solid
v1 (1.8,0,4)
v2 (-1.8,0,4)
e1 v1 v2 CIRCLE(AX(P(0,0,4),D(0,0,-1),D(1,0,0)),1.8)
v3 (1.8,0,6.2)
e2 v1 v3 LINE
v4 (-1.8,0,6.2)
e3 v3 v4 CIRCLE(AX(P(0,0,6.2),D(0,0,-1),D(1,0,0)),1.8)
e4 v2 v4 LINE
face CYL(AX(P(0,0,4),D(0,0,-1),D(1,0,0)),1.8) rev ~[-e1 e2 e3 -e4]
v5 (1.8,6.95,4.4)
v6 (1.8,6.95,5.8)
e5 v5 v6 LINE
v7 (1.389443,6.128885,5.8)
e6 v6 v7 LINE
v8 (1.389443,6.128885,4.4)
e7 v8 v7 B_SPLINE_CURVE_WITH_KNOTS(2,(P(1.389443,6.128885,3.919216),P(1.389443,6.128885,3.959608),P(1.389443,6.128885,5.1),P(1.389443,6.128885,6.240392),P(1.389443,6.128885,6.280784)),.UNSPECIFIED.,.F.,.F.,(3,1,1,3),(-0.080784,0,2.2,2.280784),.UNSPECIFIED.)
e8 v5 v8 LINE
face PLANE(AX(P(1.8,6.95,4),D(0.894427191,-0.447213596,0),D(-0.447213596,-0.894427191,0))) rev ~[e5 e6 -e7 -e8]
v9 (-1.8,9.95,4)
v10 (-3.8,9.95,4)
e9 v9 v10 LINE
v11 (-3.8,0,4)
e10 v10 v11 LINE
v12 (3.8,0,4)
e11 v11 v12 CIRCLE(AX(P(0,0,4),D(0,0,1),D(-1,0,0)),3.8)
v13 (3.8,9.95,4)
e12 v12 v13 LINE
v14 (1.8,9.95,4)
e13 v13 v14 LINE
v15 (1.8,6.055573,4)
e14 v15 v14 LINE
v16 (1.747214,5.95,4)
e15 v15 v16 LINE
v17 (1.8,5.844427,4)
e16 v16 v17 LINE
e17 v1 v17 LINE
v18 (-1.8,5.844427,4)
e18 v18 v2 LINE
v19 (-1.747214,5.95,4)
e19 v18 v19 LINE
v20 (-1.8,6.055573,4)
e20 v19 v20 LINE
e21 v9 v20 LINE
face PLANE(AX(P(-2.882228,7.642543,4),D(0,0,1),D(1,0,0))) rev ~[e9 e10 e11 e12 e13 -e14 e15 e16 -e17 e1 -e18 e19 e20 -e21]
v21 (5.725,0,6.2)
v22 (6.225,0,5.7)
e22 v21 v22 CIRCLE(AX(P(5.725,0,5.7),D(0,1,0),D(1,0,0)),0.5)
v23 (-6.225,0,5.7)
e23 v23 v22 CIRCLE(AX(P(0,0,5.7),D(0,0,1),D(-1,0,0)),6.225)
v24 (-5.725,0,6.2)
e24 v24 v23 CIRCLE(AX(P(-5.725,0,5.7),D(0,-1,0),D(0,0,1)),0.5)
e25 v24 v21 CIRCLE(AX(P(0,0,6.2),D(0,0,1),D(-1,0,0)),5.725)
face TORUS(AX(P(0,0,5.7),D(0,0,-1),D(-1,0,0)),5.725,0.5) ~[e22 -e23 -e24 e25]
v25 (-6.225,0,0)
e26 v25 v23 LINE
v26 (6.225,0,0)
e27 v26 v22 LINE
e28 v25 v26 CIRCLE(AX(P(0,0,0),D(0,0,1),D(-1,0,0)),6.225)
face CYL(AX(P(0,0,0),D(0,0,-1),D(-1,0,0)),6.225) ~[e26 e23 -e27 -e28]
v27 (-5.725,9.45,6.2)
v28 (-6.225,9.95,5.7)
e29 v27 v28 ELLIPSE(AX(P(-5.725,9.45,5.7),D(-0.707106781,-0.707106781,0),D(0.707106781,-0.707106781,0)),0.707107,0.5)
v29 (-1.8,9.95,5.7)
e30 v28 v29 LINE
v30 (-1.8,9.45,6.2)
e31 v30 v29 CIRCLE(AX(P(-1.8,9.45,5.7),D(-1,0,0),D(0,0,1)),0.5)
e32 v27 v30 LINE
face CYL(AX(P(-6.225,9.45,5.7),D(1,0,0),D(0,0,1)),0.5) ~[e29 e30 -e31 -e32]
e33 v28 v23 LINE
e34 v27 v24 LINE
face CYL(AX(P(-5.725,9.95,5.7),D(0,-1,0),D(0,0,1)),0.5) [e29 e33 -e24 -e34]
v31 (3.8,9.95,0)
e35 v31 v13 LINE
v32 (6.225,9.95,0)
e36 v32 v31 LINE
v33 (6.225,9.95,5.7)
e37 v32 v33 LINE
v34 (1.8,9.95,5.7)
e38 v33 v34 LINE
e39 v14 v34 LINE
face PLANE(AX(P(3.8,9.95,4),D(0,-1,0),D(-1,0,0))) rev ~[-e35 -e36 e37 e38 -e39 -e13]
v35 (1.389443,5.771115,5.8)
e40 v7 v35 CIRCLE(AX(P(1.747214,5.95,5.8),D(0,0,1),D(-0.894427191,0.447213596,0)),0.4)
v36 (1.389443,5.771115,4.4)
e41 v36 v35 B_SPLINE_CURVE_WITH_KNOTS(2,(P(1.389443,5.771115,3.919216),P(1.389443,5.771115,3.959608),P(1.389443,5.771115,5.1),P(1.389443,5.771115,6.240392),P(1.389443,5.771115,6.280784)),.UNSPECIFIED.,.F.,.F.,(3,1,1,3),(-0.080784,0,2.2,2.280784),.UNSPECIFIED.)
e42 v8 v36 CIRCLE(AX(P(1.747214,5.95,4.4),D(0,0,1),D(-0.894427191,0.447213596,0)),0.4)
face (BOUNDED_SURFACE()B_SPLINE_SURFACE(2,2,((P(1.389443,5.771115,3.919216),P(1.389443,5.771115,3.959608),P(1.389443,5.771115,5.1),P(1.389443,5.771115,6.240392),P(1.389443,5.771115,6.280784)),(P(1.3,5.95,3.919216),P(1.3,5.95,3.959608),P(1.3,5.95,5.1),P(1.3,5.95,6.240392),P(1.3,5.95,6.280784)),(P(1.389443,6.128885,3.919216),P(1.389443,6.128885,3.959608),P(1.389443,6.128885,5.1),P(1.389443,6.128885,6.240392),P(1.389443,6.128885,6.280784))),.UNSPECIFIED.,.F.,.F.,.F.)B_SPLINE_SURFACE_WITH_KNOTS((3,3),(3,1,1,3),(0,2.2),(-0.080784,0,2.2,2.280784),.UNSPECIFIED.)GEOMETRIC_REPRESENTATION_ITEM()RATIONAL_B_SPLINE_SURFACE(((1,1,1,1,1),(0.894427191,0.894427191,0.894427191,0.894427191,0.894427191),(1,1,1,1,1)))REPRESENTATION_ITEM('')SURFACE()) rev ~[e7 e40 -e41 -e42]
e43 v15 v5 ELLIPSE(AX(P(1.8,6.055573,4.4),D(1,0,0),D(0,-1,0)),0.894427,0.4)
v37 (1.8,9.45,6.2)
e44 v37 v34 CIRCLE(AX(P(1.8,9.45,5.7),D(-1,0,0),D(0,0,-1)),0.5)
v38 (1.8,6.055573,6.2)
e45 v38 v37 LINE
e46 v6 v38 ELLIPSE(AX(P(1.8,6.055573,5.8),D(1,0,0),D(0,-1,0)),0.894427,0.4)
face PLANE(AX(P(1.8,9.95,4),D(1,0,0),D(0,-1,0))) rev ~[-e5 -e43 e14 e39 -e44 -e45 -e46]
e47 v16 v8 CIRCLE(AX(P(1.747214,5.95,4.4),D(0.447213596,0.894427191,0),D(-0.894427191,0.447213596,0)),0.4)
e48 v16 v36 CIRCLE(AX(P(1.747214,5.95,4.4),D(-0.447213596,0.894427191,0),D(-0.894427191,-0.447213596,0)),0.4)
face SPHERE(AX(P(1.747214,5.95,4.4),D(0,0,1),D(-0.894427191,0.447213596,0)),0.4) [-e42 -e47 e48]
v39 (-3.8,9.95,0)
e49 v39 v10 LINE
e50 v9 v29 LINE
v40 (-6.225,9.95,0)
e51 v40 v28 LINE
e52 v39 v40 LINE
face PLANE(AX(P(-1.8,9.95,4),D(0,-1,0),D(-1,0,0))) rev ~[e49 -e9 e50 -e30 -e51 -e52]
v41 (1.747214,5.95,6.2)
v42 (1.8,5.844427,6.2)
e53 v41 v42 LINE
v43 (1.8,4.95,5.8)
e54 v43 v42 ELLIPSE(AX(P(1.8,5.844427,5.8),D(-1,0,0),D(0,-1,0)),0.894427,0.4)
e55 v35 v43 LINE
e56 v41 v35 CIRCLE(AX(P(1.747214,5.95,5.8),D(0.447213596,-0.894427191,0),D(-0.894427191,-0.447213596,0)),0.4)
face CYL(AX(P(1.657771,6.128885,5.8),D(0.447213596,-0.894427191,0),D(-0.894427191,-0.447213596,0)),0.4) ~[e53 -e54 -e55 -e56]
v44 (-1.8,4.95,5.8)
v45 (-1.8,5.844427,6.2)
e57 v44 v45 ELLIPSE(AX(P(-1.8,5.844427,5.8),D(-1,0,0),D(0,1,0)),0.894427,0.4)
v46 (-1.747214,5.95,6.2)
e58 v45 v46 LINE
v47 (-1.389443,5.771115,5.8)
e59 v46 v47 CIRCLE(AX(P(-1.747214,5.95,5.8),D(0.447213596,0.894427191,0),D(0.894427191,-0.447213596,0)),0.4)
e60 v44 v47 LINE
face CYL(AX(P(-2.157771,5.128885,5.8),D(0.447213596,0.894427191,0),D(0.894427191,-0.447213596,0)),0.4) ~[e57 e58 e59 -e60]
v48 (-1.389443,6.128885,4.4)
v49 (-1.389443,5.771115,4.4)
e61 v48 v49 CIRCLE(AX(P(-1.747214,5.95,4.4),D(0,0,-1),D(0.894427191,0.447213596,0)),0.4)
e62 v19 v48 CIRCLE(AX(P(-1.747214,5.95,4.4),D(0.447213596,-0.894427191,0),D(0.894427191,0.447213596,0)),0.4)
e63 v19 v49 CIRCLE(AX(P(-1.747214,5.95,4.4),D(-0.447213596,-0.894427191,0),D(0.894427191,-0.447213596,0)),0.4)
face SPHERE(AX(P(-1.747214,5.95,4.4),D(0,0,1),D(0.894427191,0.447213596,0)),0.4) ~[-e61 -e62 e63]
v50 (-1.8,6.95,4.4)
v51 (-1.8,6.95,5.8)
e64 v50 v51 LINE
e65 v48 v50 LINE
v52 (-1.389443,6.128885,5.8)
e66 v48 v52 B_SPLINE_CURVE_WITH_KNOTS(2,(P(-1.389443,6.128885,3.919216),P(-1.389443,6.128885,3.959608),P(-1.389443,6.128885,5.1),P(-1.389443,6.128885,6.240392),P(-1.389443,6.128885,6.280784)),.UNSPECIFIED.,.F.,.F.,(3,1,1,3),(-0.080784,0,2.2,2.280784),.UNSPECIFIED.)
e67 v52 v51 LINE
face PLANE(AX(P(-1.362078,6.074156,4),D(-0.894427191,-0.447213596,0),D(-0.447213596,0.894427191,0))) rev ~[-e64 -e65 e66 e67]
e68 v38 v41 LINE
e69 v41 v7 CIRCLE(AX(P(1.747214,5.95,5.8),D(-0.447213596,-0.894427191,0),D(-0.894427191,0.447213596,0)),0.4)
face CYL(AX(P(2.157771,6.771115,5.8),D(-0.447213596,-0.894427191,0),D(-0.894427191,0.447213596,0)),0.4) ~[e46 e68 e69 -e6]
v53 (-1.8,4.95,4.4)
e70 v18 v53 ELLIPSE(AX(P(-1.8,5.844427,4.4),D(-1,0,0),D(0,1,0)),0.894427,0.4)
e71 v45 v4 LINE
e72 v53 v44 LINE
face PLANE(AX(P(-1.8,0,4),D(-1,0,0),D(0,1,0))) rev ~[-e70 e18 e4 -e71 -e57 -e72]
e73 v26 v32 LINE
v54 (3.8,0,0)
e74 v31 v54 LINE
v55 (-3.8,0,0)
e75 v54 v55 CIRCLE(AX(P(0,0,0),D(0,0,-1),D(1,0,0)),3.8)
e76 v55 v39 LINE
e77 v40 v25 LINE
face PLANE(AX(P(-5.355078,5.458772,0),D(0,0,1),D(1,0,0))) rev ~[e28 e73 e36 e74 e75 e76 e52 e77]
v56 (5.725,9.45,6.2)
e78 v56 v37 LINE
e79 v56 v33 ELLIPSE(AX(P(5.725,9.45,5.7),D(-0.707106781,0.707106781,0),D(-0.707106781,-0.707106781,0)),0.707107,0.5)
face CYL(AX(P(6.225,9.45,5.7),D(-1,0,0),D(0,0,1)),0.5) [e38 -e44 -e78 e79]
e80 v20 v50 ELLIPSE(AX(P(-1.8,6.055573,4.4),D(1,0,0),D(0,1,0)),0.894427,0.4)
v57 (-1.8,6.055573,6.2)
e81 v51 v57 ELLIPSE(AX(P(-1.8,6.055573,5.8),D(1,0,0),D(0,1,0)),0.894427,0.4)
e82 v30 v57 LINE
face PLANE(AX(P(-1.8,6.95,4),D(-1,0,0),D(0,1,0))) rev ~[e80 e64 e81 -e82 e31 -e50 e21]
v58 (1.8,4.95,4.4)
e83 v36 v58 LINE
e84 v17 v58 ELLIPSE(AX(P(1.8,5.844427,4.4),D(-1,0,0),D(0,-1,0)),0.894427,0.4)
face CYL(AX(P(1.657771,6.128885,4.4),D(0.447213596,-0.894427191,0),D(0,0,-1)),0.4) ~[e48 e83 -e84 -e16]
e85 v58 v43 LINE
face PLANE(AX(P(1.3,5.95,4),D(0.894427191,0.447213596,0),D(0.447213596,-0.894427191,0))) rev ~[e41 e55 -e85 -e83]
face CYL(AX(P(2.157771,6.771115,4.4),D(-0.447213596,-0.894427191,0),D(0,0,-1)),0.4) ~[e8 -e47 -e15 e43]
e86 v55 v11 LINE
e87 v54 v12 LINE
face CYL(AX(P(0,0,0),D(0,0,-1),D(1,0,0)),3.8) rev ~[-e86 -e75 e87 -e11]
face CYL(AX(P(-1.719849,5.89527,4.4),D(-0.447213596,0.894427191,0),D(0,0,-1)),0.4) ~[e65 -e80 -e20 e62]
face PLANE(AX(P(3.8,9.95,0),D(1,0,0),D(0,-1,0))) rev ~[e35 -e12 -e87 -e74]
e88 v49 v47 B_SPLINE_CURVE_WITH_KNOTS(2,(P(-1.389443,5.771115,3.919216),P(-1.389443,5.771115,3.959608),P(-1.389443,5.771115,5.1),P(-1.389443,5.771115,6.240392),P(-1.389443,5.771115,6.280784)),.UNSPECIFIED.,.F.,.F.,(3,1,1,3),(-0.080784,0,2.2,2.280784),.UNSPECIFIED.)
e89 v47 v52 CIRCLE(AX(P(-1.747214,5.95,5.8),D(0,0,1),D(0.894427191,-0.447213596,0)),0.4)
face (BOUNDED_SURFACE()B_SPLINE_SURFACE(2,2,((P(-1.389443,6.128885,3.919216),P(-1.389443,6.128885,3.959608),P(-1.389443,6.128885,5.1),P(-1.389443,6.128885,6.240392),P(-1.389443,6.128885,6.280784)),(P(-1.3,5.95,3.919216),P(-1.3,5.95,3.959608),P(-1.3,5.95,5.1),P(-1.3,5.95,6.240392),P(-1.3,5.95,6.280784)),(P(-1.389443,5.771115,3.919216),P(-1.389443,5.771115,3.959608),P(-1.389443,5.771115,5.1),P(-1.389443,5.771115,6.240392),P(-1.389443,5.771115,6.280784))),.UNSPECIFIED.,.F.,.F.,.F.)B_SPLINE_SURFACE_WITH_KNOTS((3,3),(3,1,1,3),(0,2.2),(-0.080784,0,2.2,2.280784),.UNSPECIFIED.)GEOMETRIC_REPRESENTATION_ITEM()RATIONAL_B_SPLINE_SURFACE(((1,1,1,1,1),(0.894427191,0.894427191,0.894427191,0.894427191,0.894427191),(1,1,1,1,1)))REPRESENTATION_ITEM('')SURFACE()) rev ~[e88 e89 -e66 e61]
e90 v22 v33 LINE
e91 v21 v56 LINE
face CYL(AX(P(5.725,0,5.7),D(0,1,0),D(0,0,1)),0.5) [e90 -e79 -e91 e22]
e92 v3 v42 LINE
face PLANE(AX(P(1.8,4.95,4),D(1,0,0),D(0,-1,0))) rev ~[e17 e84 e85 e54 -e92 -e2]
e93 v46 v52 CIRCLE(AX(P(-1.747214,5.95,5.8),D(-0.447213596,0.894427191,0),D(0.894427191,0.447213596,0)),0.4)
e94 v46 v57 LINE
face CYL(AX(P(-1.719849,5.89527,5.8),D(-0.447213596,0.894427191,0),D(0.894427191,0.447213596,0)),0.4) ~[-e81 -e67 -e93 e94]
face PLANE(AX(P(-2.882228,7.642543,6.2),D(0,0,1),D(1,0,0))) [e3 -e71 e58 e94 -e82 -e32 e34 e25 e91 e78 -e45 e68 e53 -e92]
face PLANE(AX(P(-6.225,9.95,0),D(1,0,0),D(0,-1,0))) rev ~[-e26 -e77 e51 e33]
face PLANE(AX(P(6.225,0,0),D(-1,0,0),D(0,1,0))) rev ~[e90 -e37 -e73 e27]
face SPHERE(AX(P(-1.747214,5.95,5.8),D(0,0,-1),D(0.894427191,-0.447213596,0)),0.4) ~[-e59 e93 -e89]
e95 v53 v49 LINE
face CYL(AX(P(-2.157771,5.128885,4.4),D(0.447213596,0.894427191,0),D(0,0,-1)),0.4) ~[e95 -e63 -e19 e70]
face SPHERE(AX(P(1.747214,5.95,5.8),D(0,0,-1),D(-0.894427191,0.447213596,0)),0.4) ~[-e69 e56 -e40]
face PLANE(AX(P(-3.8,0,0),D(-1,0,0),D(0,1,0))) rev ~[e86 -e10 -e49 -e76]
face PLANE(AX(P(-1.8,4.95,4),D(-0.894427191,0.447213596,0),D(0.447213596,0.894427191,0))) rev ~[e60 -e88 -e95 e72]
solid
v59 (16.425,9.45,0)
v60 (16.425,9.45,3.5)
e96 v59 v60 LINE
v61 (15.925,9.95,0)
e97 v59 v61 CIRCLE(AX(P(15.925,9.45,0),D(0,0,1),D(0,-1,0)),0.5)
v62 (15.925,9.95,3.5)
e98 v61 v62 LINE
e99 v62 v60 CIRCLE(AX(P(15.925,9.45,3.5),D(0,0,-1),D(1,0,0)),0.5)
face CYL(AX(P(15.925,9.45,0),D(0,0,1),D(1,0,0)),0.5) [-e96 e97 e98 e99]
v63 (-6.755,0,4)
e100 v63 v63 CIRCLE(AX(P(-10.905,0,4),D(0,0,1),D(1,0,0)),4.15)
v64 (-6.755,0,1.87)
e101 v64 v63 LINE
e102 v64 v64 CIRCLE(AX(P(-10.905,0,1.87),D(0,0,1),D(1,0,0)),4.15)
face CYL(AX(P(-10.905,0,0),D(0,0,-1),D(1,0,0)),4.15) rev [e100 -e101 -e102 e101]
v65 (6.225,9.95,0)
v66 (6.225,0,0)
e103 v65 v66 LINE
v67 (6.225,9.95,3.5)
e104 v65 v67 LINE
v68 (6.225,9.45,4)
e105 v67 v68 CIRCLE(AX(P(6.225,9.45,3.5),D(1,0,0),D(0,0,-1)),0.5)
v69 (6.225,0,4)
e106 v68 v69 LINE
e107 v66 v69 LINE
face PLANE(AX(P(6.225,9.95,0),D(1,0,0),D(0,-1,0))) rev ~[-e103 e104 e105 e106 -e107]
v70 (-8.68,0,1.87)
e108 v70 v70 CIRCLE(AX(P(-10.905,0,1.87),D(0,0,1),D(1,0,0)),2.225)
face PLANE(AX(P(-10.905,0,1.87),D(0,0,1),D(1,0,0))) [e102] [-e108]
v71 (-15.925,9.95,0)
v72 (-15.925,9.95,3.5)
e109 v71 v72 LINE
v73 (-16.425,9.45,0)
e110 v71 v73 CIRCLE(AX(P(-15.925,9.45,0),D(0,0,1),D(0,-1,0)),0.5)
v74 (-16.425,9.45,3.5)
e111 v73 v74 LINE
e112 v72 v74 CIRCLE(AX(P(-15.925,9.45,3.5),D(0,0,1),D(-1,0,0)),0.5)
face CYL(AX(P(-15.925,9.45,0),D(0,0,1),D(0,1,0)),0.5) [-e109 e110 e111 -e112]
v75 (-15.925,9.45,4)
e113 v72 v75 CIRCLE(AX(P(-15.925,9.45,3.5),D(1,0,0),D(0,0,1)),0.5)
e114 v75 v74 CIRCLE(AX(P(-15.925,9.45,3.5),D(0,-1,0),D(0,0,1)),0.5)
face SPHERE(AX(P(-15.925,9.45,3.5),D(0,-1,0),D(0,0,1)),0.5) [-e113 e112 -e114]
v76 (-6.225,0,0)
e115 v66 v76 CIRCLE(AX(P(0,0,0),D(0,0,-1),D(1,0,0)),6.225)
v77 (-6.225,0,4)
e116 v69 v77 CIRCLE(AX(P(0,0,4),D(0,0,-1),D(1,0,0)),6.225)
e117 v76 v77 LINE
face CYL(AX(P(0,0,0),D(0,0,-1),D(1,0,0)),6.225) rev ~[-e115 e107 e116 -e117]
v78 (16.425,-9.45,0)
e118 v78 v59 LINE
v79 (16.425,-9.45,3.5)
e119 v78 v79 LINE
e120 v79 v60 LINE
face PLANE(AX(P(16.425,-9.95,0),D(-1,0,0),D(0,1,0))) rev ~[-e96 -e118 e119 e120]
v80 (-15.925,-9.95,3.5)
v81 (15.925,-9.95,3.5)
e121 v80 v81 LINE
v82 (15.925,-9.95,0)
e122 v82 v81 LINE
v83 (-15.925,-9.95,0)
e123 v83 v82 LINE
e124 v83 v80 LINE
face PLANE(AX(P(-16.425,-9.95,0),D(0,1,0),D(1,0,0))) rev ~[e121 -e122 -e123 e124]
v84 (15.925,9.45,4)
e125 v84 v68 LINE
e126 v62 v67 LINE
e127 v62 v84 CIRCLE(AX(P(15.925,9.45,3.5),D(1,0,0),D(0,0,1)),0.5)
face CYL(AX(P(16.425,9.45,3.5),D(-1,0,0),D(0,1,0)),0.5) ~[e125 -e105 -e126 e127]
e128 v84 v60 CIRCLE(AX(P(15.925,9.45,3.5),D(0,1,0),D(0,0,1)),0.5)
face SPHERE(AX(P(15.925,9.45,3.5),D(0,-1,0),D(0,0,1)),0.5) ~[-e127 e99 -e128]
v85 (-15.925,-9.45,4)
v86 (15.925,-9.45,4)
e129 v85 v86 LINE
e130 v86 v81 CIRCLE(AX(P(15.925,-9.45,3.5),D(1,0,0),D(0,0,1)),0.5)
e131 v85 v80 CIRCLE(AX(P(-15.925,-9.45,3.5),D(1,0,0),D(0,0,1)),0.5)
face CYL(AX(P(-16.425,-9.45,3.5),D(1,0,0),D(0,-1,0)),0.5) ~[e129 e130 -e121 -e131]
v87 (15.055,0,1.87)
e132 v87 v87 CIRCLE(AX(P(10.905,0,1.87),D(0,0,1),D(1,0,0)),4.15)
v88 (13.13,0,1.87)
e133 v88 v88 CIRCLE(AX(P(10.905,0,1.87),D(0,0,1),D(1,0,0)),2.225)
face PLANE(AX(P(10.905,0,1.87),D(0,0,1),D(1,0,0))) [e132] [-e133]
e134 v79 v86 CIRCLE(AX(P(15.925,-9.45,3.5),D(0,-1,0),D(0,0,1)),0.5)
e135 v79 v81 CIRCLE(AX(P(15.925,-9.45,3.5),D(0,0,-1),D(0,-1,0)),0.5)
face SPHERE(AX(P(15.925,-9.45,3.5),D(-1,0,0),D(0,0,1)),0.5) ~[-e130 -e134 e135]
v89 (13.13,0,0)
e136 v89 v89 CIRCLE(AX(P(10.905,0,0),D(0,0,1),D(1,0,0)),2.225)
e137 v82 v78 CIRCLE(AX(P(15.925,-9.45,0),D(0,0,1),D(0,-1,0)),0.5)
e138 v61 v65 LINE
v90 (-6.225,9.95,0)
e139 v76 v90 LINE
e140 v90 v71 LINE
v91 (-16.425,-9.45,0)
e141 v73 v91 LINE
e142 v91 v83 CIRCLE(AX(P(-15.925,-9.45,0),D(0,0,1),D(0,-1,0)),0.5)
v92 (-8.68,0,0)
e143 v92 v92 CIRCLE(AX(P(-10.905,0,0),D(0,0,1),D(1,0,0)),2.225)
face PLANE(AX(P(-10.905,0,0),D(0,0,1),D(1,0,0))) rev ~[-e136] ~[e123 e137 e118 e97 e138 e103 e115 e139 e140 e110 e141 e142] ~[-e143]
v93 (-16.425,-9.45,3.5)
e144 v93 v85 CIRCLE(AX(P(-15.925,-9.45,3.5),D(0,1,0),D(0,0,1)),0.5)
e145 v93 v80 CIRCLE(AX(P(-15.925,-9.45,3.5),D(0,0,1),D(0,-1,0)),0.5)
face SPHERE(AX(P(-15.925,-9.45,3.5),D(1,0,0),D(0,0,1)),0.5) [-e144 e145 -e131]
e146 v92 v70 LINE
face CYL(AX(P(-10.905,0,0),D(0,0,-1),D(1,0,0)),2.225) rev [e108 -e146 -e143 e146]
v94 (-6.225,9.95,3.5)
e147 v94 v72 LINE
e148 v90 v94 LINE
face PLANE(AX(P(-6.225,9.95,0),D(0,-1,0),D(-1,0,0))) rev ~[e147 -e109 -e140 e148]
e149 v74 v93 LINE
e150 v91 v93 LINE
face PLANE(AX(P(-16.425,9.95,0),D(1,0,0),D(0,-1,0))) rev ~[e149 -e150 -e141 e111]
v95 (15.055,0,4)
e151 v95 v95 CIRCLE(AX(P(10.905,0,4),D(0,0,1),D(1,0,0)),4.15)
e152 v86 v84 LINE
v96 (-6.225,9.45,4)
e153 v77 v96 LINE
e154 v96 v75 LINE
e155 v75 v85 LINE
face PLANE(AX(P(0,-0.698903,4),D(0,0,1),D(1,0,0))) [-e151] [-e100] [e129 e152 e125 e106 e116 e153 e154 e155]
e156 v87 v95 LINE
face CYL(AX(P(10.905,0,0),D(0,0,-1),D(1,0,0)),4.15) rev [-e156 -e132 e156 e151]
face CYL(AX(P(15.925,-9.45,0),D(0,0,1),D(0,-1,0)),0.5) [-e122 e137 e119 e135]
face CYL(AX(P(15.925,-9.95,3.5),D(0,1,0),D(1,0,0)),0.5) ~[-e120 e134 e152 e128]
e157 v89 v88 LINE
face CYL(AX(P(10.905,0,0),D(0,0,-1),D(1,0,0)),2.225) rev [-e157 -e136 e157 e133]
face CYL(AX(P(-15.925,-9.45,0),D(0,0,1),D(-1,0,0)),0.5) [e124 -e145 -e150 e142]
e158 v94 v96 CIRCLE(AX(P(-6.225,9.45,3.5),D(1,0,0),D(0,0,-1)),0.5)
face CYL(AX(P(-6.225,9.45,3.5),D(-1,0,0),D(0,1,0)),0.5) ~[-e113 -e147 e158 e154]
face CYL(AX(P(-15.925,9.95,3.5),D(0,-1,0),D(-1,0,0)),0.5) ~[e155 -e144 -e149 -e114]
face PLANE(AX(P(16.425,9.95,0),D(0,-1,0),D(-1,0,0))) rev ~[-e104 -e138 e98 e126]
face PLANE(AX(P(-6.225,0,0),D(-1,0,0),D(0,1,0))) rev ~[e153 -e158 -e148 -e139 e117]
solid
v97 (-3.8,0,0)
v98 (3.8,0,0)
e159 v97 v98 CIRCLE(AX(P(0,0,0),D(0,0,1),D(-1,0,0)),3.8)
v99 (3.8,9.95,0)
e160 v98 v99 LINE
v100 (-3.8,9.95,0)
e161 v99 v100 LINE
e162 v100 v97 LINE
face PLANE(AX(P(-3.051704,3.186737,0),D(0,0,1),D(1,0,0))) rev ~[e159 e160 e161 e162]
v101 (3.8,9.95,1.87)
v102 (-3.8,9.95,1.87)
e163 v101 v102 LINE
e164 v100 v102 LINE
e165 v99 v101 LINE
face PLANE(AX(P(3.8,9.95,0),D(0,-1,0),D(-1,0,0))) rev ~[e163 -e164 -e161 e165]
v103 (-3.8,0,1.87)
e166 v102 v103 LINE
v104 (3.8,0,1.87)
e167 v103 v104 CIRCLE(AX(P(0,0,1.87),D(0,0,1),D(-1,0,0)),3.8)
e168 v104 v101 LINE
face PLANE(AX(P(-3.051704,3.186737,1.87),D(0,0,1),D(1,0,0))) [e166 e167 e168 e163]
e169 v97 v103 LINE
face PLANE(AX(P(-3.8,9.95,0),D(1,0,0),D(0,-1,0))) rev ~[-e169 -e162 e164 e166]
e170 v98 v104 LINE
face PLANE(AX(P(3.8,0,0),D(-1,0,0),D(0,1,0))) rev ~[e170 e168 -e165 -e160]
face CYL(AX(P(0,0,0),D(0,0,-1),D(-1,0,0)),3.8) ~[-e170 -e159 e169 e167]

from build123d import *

# Parameters (mm, degrees)
F0_R     = 4.15
F1_DEPTH = 4
F0_R_2   = 2.225
F2_DEPTH = 1.87
F3_DEPTH = 6.2
F4_START = 4
F4_DEPTH = 2.2
F5_R     = 0.4
F6_R     = 0.5
F6_2_R   = 0.5


with BuildPart() as f1:
    # F0 (on Top) → F1 (new body)
    with BuildSketch(Plane.XY):
        with BuildLine():
            Line((-6.225, 9.95), (-16.425, 9.95))
            Line((-16.425, 9.95), (-16.425, -9.95))
            Line((-16.425, -9.95), (16.425, -9.95))
            Line((16.425, -9.95), (16.425, 9.95))
            Line((16.425, 9.95), (6.225, 9.95))
            Line((6.225, 9.95), (6.225, 0))
            ThreePointArc((6.225, 0), (0, -6.225), (-6.225, 0))
            Line((-6.225, 0), (-6.225, 9.95))
        make_face()
        with Locations((-10.905, 0)):
            Circle(F0_R, mode=Mode.SUBTRACT)
        with Locations((10.905, 0)):
            Circle(F0_R, mode=Mode.SUBTRACT)
    extrude(amount=F1_DEPTH)

    # F0 (on Top) → F2 (join)
    with BuildSketch(Plane.XY):
        with Locations((-10.905, 0)):
            Circle(F0_R)
        with Locations((-10.905, 0)):
            Circle(F0_R_2, mode=Mode.SUBTRACT)
        with Locations((10.905, 0)):
            Circle(F0_R)
        with Locations((10.905, 0)):
            Circle(F0_R_2, mode=Mode.SUBTRACT)
    extrude(amount=F2_DEPTH)

    # F6
    f6_edges = [f1.edges().sort_by_distance(p)[0] for p in [
        (0, -9.95, 4),
        (16.425, 0, 4),
        (-16.425, 0, 4),
        (-11.325, 9.95, 4),
        (11.325, 9.95, 4),
        (16.425, -9.95, 2),
        (-16.425, -9.95, 2),
        (16.425, 9.95, 2),
        (-16.425, 9.95, 2),
    ]]
    fillet(f6_edges, radius=F6_R)


with BuildPart() as f2:
    # F0 (on Top) → F2, piece 2 (new body)
    with BuildSketch(Plane.XY):
        with BuildLine():
            ThreePointArc((-1.8, 5.9590792074), (-2.8468319847, 5.5358985405), (-3.8, 4.9305805946))
            Line((-3.8, 4.9305805946), (-3.8, 0))
            ThreePointArc((-3.8, 0), (-3.2619012861, 1.949358869), (-1.8, 3.3466401061))
            Line((-1.8, 3.3466401061), (-1.8, 4.95))
            Line((-1.8, 4.95), (-1.8, 5.9590792074))
        make_face()
        with BuildLine():
            ThreePointArc((1.8, 3.3466401061), (0, 3.8), (-1.8, 3.3466401061))
            Line((-1.8, 3.3466401061), (-1.8, 0))
            ThreePointArc((-1.8, 0), (0, 1.8), (1.8, 0))
            Line((1.8, 0), (1.8, 3.3466401061))
        make_face()
        with BuildLine():
            ThreePointArc((-1.8, 3.3466401061), (-3.2619012861, 1.949358869), (-3.8, 0))
            ThreePointArc((-3.8, 0), (0, -3.8), (3.8, 0))
            ThreePointArc((3.8, 0), (3.2619012861, 1.949358869), (1.8, 3.3466401061))
            Line((1.8, 3.3466401061), (1.8, 0))
            ThreePointArc((1.8, 0), (0, -1.8), (-1.8, 0))
            Line((-1.8, 0), (-1.8, 3.3466401061))
        make_face()
        with BuildLine():
            ThreePointArc((1.8, 0), (0, 1.8), (-1.8, 0))
            ThreePointArc((-1.8, 0), (0, -1.8), (1.8, 0))
        make_face()
        with BuildLine():
            ThreePointArc((1.3620779041, 6.0741558083), (0, 6.225), (-1.3620779041, 6.0741558083))
            Line((-1.3620779041, 6.0741558083), (-1.3, 5.95))
            Line((-1.3, 5.95), (-1.8, 4.95))
            Line((-1.8, 4.95), (-1.8, 3.3466401061))
            ThreePointArc((-1.8, 3.3466401061), (0, 3.8), (1.8, 3.3466401061))
            Line((1.8, 3.3466401061), (1.8, 4.95))
            Line((1.8, 4.95), (1.3, 5.95))
            Line((1.3, 5.95), (1.3620779041, 6.0741558083))
        make_face()
        with BuildLine():
            Line((1.8, 9.95), (-1.8, 9.95))
            Line((-1.8, 9.95), (-1.8, 6.95))
            Line((-1.8, 6.95), (-1.3620779041, 6.0741558083))
            ThreePointArc((-1.3620779041, 6.0741558083), (0, 6.225), (1.3620779041, 6.0741558083))
            Line((1.3620779041, 6.0741558083), (1.8, 6.95))
            Line((1.8, 6.95), (1.8, 9.95))
        make_face()
        with BuildLine():
            Line((-1.8, 9.95), (-3.8, 9.95))
            Line((-3.8, 9.95), (-3.8, 4.9305805946))
            ThreePointArc((-3.8, 4.9305805946), (-2.8468319847, 5.5358985405), (-1.8, 5.9590792074))
            Line((-1.8, 5.9590792074), (-1.8, 6.95))
            Line((-1.8, 6.95), (-1.8, 9.95))
        make_face()
        with BuildLine():
            Line((3.8, 9.95), (1.8, 9.95))
            Line((1.8, 9.95), (1.8, 6.95))
            Line((1.8, 6.95), (1.8, 5.9590792074))
            ThreePointArc((1.8, 5.9590792074), (2.8468319847, 5.5358985405), (3.8, 4.9305805946))
            Line((3.8, 4.9305805946), (3.8, 9.95))
        make_face()
        with BuildLine():
            Line((3.8, 0), (3.8, 4.9305805946))
            ThreePointArc((3.8, 4.9305805946), (2.8468319847, 5.5358985405), (1.8, 5.9590792074))
            Line((1.8, 5.9590792074), (1.8, 4.95))
            Line((1.8, 4.95), (1.8, 3.3466401061))
            ThreePointArc((1.8, 3.3466401061), (3.2619012861, 1.949358869), (3.8, 0))
        make_face()
        with BuildLine():
            Line((1.8, 4.95), (1.8, 5.9590792074))
            ThreePointArc((1.8, 5.9590792074), (1.5820855931, 6.020600483), (1.3620779041, 6.0741558083))
            Line((1.3620779041, 6.0741558083), (1.3, 5.95))
            Line((1.3, 5.95), (1.8, 4.95))
        make_face()
        with BuildLine():
            Line((1.8, 5.9590792074), (1.8, 6.95))
            Line((1.8, 6.95), (1.3620779041, 6.0741558083))
            ThreePointArc((1.3620779041, 6.0741558083), (1.5820855931, 6.020600483), (1.8, 5.9590792074))
        make_face()
        with BuildLine():
            Line((-1.3620779041, 6.0741558083), (-1.8, 6.95))
            Line((-1.8, 6.95), (-1.8, 5.9590792074))
            ThreePointArc((-1.8, 5.9590792074), (-1.5820855931, 6.020600483), (-1.3620779041, 6.0741558083))
        make_face()
        with BuildLine():
            ThreePointArc((-1.3620779041, 6.0741558083), (-1.5820855931, 6.020600483), (-1.8, 5.9590792074))
            Line((-1.8, 5.9590792074), (-1.8, 4.95))
            Line((-1.8, 4.95), (-1.3, 5.95))
            Line((-1.3, 5.95), (-1.3620779041, 6.0741558083))
        make_face()
    extrude(amount=F2_DEPTH)


with BuildPart() as f3:
    # F0 (on Top) → F3 (new body)
    with BuildSketch(Plane.XY):
        with BuildLine():
            Line((-3.8, 9.95), (-6.225, 9.95))
            Line((-6.225, 9.95), (-6.225, 0))
            ThreePointArc((-6.225, 0), (-5.585947771, 2.7473282476), (-3.8, 4.9305805946))
            Line((-3.8, 4.9305805946), (-3.8, 9.95))
        make_face()
        with BuildLine():
            ThreePointArc((-3.8, 4.9305805946), (-5.585947771, 2.7473282476), (-6.225, 0))
            ThreePointArc((-6.225, 0), (0, -6.225), (6.225, 0))
            ThreePointArc((6.225, 0), (5.585947771, 2.7473282476), (3.8, 4.9305805946))
            Line((3.8, 4.9305805946), (3.8, 0))
            ThreePointArc((3.8, 0), (0, -3.8), (-3.8, 0))
            Line((-3.8, 0), (-3.8, 4.9305805946))
        make_face()
        with BuildLine():
            ThreePointArc((3.8, 4.9305805946), (5.585947771, 2.7473282476), (6.225, 0))
            Line((6.225, 0), (6.225, 9.95))
            Line((6.225, 9.95), (3.8, 9.95))
            Line((3.8, 9.95), (3.8, 4.9305805946))
        make_face()
    extrude(amount=F3_DEPTH)

    # F0 (on Top) → F4 (join)
    with BuildSketch(Plane.XY.offset(F4_START)):
        with BuildLine():
            Line((-1.8, 9.95), (-3.8, 9.95))
            Line((-3.8, 9.95), (-3.8, 4.9305805946))
            ThreePointArc((-3.8, 4.9305805946), (-2.8468319847, 5.5358985405), (-1.8, 5.9590792074))
            Line((-1.8, 5.9590792074), (-1.8, 6.95))
            Line((-1.8, 6.95), (-1.8, 9.95))
        make_face()
        with BuildLine():
            ThreePointArc((-1.8, 5.9590792074), (-2.8468319847, 5.5358985405), (-3.8, 4.9305805946))
            Line((-3.8, 4.9305805946), (-3.8, 0))
            ThreePointArc((-3.8, 0), (-3.2619012861, 1.949358869), (-1.8, 3.3466401061))
            Line((-1.8, 3.3466401061), (-1.8, 4.95))
            Line((-1.8, 4.95), (-1.8, 5.9590792074))
        make_face()
        with BuildLine():
            ThreePointArc((-1.8, 3.3466401061), (-3.2619012861, 1.949358869), (-3.8, 0))
            ThreePointArc((-3.8, 0), (0, -3.8), (3.8, 0))
            ThreePointArc((3.8, 0), (3.2619012861, 1.949358869), (1.8, 3.3466401061))
            Line((1.8, 3.3466401061), (1.8, 0))
            ThreePointArc((1.8, 0), (0, -1.8), (-1.8, 0))
            Line((-1.8, 0), (-1.8, 3.3466401061))
        make_face()
        with BuildLine():
            Line((3.8, 0), (3.8, 4.9305805946))
            ThreePointArc((3.8, 4.9305805946), (2.8468319847, 5.5358985405), (1.8, 5.9590792074))
            Line((1.8, 5.9590792074), (1.8, 4.95))
            Line((1.8, 4.95), (1.8, 3.3466401061))
            ThreePointArc((1.8, 3.3466401061), (3.2619012861, 1.949358869), (3.8, 0))
        make_face()
        with BuildLine():
            Line((3.8, 9.95), (1.8, 9.95))
            Line((1.8, 9.95), (1.8, 6.95))
            Line((1.8, 6.95), (1.8, 5.9590792074))
            ThreePointArc((1.8, 5.9590792074), (2.8468319847, 5.5358985405), (3.8, 4.9305805946))
            Line((3.8, 4.9305805946), (3.8, 9.95))
        make_face()
        with BuildLine():
            Line((-1.3620779041, 6.0741558083), (-1.8, 6.95))
            Line((-1.8, 6.95), (-1.8, 5.9590792074))
            ThreePointArc((-1.8, 5.9590792074), (-1.5820855931, 6.020600483), (-1.3620779041, 6.0741558083))
        make_face()
        with BuildLine():
            ThreePointArc((-1.3620779041, 6.0741558083), (-1.5820855931, 6.020600483), (-1.8, 5.9590792074))
            Line((-1.8, 5.9590792074), (-1.8, 4.95))
            Line((-1.8, 4.95), (-1.3, 5.95))
            Line((-1.3, 5.95), (-1.3620779041, 6.0741558083))
        make_face()
        with BuildLine():
            Line((1.8, 4.95), (1.8, 5.9590792074))
            ThreePointArc((1.8, 5.9590792074), (1.5820855931, 6.020600483), (1.3620779041, 6.0741558083))
            Line((1.3620779041, 6.0741558083), (1.3, 5.95))
            Line((1.3, 5.95), (1.8, 4.95))
        make_face()
        with BuildLine():
            Line((1.8, 5.9590792074), (1.8, 6.95))
            Line((1.8, 6.95), (1.3620779041, 6.0741558083))
            ThreePointArc((1.3620779041, 6.0741558083), (1.5820855931, 6.020600483), (1.8, 5.9590792074))
        make_face()
    extrude(amount=F4_DEPTH)

    # F5
    f5_edges = [f3.edges().sort_by_distance(p)[0] for p in [
        (1.55, 6.45, 6.2),
        (1.55, 5.45, 6.2),
        (-1.55, 5.45, 6.2),
        (-1.55, 6.45, 6.2),
        (-1.55, 6.45, 4),
        (1.55, 6.45, 4),
        (-1.55, 5.45, 4),
        (1.55, 5.45, 4),
        (-1.3, 5.95, 5.1),
        (1.3, 5.95, 5.1),
    ]]
    fillet(f5_edges, radius=F5_R)

    # F6#2
    f6_2_edges = [f3.edges().sort_by_distance(p)[0] for p in [
        (-4.0125, 9.95, 6.2),
        (4.0125, 9.95, 6.2),
        (6.225, 4.975, 6.2),
    ]]
    fillet(f6_2_edges, radius=F6_2_R)


solid = Compound([f1.part, f2.part, f3.part])
